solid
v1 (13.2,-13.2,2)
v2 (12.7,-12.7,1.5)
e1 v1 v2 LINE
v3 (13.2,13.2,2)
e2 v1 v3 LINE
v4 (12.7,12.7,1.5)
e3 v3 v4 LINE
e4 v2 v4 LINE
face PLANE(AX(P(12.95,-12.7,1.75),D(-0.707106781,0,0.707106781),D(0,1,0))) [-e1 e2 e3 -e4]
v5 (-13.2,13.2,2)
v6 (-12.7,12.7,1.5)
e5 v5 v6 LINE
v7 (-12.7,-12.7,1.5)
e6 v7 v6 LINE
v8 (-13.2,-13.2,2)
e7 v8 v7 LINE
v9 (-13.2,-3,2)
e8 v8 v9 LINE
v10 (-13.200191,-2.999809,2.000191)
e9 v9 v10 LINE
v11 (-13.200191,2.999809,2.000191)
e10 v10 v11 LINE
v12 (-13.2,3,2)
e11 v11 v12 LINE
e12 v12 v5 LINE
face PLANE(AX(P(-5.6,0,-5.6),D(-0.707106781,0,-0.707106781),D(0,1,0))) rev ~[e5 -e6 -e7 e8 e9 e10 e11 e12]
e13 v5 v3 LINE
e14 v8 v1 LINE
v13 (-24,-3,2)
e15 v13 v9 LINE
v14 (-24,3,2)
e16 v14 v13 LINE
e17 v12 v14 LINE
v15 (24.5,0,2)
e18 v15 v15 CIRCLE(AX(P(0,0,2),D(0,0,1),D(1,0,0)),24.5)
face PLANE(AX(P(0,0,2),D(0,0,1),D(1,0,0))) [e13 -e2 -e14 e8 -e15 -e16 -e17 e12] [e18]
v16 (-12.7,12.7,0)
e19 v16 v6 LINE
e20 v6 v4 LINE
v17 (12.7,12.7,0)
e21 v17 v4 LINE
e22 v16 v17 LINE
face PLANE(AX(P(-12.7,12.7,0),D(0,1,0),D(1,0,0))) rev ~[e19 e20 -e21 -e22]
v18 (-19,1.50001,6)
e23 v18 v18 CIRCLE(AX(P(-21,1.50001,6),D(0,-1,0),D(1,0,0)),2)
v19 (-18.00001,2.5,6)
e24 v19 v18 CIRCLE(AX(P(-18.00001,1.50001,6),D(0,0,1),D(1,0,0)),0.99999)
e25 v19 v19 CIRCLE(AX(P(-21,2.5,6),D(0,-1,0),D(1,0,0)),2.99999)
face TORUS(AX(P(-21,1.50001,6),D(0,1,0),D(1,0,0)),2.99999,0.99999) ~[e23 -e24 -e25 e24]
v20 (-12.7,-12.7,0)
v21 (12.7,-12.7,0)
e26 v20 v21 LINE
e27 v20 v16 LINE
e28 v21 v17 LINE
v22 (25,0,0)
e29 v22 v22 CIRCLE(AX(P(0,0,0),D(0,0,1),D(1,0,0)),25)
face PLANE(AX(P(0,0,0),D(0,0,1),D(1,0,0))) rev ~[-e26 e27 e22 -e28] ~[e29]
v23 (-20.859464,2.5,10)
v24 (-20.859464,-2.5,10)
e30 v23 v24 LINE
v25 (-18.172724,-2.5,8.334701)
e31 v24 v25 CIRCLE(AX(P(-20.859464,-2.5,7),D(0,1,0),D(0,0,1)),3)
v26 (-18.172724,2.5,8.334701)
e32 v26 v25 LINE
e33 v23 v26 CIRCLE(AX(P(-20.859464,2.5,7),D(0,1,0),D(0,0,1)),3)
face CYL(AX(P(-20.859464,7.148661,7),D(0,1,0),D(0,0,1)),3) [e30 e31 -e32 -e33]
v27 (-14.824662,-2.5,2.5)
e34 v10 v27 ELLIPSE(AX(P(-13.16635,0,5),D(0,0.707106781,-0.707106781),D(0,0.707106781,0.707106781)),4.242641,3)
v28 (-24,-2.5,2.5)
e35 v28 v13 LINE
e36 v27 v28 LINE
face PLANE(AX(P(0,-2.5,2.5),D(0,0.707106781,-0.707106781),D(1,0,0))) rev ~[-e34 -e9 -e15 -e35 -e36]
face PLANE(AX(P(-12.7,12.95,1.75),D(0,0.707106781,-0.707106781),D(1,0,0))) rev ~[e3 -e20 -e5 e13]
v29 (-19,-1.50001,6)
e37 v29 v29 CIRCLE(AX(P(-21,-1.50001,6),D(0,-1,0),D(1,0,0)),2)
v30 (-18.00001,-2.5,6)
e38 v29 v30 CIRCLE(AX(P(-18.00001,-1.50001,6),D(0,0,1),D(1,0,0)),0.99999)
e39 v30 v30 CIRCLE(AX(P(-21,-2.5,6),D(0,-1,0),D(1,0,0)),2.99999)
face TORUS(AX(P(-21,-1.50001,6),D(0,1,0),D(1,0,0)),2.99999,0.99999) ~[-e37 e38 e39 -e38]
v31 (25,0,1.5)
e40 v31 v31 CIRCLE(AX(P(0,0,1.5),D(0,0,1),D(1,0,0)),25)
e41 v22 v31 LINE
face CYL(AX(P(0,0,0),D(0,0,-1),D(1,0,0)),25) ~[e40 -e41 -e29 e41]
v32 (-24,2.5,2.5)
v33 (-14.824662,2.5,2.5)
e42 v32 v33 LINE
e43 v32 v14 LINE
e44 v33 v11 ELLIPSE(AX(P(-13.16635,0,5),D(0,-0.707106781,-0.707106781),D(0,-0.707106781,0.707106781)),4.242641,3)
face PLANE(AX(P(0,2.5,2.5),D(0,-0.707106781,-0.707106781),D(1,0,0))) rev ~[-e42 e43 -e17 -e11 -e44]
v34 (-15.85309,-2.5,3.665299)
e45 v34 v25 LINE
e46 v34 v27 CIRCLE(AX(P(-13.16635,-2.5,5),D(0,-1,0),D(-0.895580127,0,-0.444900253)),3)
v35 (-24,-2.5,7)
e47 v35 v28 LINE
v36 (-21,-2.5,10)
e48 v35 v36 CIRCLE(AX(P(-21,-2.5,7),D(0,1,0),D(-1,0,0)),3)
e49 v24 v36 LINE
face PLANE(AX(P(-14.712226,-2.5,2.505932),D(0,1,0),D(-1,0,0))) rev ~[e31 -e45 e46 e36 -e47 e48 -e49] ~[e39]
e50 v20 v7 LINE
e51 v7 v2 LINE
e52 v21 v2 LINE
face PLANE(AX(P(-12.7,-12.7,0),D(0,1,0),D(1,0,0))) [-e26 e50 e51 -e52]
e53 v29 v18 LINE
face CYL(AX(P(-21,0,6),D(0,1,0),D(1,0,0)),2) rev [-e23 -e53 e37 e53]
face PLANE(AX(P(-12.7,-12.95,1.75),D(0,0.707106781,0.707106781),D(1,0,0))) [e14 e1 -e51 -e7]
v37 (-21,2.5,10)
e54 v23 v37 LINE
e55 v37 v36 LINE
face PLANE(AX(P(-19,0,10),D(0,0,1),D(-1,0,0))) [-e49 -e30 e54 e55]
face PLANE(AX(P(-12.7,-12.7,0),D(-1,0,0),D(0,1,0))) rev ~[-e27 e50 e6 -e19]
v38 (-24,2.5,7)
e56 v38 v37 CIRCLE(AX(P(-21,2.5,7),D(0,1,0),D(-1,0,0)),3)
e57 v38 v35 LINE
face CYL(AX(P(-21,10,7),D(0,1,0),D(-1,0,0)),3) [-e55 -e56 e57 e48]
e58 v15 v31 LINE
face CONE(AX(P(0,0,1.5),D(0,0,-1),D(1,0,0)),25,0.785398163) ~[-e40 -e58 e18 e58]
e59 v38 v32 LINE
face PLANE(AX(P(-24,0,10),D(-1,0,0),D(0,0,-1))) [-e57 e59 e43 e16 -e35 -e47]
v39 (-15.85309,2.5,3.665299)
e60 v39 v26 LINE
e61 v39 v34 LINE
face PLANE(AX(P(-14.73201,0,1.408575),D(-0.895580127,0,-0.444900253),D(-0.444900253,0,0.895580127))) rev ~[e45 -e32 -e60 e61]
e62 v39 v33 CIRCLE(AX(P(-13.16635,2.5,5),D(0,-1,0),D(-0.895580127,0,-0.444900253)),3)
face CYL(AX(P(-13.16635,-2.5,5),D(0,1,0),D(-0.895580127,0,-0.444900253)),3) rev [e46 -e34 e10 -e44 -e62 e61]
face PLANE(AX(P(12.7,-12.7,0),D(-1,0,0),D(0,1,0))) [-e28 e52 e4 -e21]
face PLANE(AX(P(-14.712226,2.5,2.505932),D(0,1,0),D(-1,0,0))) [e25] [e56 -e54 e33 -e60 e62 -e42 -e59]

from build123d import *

# Parameters (mm, degrees)
F0_R          = 25
F0_W          = 25.4
F0_H          = 25.4
F1_DEPTH      = 2
F2_R          = 2
F3_DEPTH      = 2.5
F3_DEPTH_BACK = 2.5
F4_SIZE       = 0.5
F5_R          = 0.99999
F6_T4_DEPTH   = 5
F6_T9_DEPTH   = 5.1486606532
F6_T15_DEPTH  = 5.1486606532
F6_T18_DEPTH  = 20
F6_T20_DEPTH  = 14.2973213065


# Not quite as in the source:
# - a fillet or chamfer that OpenCascade refuses, or shapes differently, is made with other operations: its cross-section is extruded or revolved along the edge and cut away or added
# - a fillet or chamfer is up to 0.001 mm smaller than in the source, because OpenCascade refuses the exact size


with BuildPart() as f1:
    # F0 (on Top) → F1 (new body)
    with BuildSketch(Plane.XY):
        Circle(F0_R)
        Rectangle(F0_W, F0_H, mode=Mode.SUBTRACT)
    extrude(amount=F1_DEPTH)

    # F2 (on Front) → F3 (join, two sides)
    with BuildSketch(Plane.XZ) as f3_sk:
        Polygon((-24, 10), (-24, 1.4085747534), (-14.7320097312, 1.4085747534), (-19, 10), align=None)
        with Locations((-21, 6)):
            Circle(F2_R, mode=Mode.SUBTRACT)
    extrude(amount=F3_DEPTH)
    extrude(f3_sk.sketch, amount=-F3_DEPTH_BACK)

    # F4
    f4_edges = [f1.edges().sort_by_distance(p)[0] for p in [
        (0, 12.7, 2),
        (12.7, 0, 2),
        (0, -12.7, 2),
        (-12.7, 0, 2),
        (-25, 0, 2),
        (-19.512907, 2.5, 2),
        (-19.512907, -2.5, 2),
    ]]
    chamfer(f4_edges, length=F4_SIZE)

    # F5 (radius 1 in the source; OpenCascade refuses exactly that, so slightly less here)
    f5_edges = [f1.edges().sort_by_distance(p)[0] for p in [
        (-23, -2.5, 6),
        (-23, 2.5, 6),
    ]]
    fillet(f5_edges, radius=F5_R)

    # F6: fillet of radius 3 on 3 edges, made by hand


with BuildPart() as f6_tool2:
    # F6_s3 → F6_t4 (new body)
    with BuildSketch(Plane.XZ.offset(-2.5)):
        with BuildLine():
            ThreePointArc((-15.8530900959, 3.66529924), (-14.7468397832, 2.4500880133), (-13.1663497137, 2))
            Line((-13.1663497137, 2), (-15.025813975, 2))
            Line((-15.025813975, 2), (-15.8530900959, 3.66529924))
        make_face()
    extrude(amount=F6_T4_DEPTH)

    split(bisect_by=Plane(origin=(-5.6, 0, -5.6), x_dir=(0, 1, 0), z_dir=(-0.7071067812, 0, -0.7071067812)), keep=Keep.TOP)


with BuildPart() as f1_1:
    add(f1.part)

    # F6_t1: union F6_tool2
    add(f6_tool2.part)


with BuildPart() as f6_tool7:
    # F6_s8 → F6_t9 (new body)
    with BuildSketch(Plane.XZ.offset(-2.5)):
        with BuildLine():
            ThreePointArc((-15.8530900959, 3.66529924), (-14.7468397832, 2.4500880133), (-13.1663497137, 2))
            Line((-13.1663497137, 2), (-15.025813975, 2))
            Line((-15.025813975, 2), (-15.8530900959, 3.66529924))
        make_face()
    extrude(amount=-F6_T9_DEPTH)

    split(bisect_by=Plane(origin=(0, 2.5, 2.5), x_dir=(1, 0, 0), z_dir=(0, -0.7071067812, -0.7071067812)), keep=Keep.TOP)

    split(bisect_by=Plane(origin=(-5.6, 0, -5.6), x_dir=(0, 1, 0), z_dir=(-0.7071067812, 0, -0.7071067812)), keep=Keep.TOP)


with BuildPart() as f1_2:
    add(f1_1.part)

    # F6_t6: union F6_tool7
    add(f6_tool7.part)


with BuildPart() as f6_tool13:
    # F6_s14 → F6_t15 (new body)
    with BuildSketch(Plane.XZ.offset(2.5)):
        with BuildLine():
            ThreePointArc((-15.8530900959, 3.66529924), (-14.7468397832, 2.4500880133), (-13.1663497137, 2))
            Line((-13.1663497137, 2), (-15.025813975, 2))
            Line((-15.025813975, 2), (-15.8530900959, 3.66529924))
        make_face()
    extrude(amount=F6_T15_DEPTH)

    split(bisect_by=Plane(origin=(0, -2.5, 2.5), x_dir=(1, 0, 0), z_dir=(0, 0.7071067812, -0.7071067812)), keep=Keep.TOP)

    split(bisect_by=Plane(origin=(-5.6, 0, -5.6), x_dir=(0, 1, 0), z_dir=(-0.7071067812, 0, -0.7071067812)), keep=Keep.TOP)


with BuildPart() as f1_3:
    add(f1_2.part)

    # F6_t12: union F6_tool13
    add(f6_tool13.part)

    # F6_s19 → F6_t18 (cut)
    with BuildSketch(Plane.XZ.offset(-10)):
        with BuildLine():
            ThreePointArc((-24, 7), (-23.1213203436, 9.1213203436), (-21, 10))
            Line((-21, 10), (-24, 10))
            Line((-24, 10), (-24, 7))
        make_face()
    extrude(amount=F6_T18_DEPTH, mode=Mode.SUBTRACT)

    # F6_s21 → F6_t20 (cut)
    with BuildSketch(Plane.XZ.offset(-7.1486606532)):
        with BuildLine():
            ThreePointArc((-20.8594642613, 10), (-19.2789741917, 9.5499119867), (-18.1727238791, 8.33470076))
            Line((-18.1727238791, 8.33470076), (-19, 10))
            Line((-19, 10), (-20.8594642613, 10))
        make_face()
    extrude(amount=F6_T20_DEPTH, mode=Mode.SUBTRACT)


solid = f1_3.part
